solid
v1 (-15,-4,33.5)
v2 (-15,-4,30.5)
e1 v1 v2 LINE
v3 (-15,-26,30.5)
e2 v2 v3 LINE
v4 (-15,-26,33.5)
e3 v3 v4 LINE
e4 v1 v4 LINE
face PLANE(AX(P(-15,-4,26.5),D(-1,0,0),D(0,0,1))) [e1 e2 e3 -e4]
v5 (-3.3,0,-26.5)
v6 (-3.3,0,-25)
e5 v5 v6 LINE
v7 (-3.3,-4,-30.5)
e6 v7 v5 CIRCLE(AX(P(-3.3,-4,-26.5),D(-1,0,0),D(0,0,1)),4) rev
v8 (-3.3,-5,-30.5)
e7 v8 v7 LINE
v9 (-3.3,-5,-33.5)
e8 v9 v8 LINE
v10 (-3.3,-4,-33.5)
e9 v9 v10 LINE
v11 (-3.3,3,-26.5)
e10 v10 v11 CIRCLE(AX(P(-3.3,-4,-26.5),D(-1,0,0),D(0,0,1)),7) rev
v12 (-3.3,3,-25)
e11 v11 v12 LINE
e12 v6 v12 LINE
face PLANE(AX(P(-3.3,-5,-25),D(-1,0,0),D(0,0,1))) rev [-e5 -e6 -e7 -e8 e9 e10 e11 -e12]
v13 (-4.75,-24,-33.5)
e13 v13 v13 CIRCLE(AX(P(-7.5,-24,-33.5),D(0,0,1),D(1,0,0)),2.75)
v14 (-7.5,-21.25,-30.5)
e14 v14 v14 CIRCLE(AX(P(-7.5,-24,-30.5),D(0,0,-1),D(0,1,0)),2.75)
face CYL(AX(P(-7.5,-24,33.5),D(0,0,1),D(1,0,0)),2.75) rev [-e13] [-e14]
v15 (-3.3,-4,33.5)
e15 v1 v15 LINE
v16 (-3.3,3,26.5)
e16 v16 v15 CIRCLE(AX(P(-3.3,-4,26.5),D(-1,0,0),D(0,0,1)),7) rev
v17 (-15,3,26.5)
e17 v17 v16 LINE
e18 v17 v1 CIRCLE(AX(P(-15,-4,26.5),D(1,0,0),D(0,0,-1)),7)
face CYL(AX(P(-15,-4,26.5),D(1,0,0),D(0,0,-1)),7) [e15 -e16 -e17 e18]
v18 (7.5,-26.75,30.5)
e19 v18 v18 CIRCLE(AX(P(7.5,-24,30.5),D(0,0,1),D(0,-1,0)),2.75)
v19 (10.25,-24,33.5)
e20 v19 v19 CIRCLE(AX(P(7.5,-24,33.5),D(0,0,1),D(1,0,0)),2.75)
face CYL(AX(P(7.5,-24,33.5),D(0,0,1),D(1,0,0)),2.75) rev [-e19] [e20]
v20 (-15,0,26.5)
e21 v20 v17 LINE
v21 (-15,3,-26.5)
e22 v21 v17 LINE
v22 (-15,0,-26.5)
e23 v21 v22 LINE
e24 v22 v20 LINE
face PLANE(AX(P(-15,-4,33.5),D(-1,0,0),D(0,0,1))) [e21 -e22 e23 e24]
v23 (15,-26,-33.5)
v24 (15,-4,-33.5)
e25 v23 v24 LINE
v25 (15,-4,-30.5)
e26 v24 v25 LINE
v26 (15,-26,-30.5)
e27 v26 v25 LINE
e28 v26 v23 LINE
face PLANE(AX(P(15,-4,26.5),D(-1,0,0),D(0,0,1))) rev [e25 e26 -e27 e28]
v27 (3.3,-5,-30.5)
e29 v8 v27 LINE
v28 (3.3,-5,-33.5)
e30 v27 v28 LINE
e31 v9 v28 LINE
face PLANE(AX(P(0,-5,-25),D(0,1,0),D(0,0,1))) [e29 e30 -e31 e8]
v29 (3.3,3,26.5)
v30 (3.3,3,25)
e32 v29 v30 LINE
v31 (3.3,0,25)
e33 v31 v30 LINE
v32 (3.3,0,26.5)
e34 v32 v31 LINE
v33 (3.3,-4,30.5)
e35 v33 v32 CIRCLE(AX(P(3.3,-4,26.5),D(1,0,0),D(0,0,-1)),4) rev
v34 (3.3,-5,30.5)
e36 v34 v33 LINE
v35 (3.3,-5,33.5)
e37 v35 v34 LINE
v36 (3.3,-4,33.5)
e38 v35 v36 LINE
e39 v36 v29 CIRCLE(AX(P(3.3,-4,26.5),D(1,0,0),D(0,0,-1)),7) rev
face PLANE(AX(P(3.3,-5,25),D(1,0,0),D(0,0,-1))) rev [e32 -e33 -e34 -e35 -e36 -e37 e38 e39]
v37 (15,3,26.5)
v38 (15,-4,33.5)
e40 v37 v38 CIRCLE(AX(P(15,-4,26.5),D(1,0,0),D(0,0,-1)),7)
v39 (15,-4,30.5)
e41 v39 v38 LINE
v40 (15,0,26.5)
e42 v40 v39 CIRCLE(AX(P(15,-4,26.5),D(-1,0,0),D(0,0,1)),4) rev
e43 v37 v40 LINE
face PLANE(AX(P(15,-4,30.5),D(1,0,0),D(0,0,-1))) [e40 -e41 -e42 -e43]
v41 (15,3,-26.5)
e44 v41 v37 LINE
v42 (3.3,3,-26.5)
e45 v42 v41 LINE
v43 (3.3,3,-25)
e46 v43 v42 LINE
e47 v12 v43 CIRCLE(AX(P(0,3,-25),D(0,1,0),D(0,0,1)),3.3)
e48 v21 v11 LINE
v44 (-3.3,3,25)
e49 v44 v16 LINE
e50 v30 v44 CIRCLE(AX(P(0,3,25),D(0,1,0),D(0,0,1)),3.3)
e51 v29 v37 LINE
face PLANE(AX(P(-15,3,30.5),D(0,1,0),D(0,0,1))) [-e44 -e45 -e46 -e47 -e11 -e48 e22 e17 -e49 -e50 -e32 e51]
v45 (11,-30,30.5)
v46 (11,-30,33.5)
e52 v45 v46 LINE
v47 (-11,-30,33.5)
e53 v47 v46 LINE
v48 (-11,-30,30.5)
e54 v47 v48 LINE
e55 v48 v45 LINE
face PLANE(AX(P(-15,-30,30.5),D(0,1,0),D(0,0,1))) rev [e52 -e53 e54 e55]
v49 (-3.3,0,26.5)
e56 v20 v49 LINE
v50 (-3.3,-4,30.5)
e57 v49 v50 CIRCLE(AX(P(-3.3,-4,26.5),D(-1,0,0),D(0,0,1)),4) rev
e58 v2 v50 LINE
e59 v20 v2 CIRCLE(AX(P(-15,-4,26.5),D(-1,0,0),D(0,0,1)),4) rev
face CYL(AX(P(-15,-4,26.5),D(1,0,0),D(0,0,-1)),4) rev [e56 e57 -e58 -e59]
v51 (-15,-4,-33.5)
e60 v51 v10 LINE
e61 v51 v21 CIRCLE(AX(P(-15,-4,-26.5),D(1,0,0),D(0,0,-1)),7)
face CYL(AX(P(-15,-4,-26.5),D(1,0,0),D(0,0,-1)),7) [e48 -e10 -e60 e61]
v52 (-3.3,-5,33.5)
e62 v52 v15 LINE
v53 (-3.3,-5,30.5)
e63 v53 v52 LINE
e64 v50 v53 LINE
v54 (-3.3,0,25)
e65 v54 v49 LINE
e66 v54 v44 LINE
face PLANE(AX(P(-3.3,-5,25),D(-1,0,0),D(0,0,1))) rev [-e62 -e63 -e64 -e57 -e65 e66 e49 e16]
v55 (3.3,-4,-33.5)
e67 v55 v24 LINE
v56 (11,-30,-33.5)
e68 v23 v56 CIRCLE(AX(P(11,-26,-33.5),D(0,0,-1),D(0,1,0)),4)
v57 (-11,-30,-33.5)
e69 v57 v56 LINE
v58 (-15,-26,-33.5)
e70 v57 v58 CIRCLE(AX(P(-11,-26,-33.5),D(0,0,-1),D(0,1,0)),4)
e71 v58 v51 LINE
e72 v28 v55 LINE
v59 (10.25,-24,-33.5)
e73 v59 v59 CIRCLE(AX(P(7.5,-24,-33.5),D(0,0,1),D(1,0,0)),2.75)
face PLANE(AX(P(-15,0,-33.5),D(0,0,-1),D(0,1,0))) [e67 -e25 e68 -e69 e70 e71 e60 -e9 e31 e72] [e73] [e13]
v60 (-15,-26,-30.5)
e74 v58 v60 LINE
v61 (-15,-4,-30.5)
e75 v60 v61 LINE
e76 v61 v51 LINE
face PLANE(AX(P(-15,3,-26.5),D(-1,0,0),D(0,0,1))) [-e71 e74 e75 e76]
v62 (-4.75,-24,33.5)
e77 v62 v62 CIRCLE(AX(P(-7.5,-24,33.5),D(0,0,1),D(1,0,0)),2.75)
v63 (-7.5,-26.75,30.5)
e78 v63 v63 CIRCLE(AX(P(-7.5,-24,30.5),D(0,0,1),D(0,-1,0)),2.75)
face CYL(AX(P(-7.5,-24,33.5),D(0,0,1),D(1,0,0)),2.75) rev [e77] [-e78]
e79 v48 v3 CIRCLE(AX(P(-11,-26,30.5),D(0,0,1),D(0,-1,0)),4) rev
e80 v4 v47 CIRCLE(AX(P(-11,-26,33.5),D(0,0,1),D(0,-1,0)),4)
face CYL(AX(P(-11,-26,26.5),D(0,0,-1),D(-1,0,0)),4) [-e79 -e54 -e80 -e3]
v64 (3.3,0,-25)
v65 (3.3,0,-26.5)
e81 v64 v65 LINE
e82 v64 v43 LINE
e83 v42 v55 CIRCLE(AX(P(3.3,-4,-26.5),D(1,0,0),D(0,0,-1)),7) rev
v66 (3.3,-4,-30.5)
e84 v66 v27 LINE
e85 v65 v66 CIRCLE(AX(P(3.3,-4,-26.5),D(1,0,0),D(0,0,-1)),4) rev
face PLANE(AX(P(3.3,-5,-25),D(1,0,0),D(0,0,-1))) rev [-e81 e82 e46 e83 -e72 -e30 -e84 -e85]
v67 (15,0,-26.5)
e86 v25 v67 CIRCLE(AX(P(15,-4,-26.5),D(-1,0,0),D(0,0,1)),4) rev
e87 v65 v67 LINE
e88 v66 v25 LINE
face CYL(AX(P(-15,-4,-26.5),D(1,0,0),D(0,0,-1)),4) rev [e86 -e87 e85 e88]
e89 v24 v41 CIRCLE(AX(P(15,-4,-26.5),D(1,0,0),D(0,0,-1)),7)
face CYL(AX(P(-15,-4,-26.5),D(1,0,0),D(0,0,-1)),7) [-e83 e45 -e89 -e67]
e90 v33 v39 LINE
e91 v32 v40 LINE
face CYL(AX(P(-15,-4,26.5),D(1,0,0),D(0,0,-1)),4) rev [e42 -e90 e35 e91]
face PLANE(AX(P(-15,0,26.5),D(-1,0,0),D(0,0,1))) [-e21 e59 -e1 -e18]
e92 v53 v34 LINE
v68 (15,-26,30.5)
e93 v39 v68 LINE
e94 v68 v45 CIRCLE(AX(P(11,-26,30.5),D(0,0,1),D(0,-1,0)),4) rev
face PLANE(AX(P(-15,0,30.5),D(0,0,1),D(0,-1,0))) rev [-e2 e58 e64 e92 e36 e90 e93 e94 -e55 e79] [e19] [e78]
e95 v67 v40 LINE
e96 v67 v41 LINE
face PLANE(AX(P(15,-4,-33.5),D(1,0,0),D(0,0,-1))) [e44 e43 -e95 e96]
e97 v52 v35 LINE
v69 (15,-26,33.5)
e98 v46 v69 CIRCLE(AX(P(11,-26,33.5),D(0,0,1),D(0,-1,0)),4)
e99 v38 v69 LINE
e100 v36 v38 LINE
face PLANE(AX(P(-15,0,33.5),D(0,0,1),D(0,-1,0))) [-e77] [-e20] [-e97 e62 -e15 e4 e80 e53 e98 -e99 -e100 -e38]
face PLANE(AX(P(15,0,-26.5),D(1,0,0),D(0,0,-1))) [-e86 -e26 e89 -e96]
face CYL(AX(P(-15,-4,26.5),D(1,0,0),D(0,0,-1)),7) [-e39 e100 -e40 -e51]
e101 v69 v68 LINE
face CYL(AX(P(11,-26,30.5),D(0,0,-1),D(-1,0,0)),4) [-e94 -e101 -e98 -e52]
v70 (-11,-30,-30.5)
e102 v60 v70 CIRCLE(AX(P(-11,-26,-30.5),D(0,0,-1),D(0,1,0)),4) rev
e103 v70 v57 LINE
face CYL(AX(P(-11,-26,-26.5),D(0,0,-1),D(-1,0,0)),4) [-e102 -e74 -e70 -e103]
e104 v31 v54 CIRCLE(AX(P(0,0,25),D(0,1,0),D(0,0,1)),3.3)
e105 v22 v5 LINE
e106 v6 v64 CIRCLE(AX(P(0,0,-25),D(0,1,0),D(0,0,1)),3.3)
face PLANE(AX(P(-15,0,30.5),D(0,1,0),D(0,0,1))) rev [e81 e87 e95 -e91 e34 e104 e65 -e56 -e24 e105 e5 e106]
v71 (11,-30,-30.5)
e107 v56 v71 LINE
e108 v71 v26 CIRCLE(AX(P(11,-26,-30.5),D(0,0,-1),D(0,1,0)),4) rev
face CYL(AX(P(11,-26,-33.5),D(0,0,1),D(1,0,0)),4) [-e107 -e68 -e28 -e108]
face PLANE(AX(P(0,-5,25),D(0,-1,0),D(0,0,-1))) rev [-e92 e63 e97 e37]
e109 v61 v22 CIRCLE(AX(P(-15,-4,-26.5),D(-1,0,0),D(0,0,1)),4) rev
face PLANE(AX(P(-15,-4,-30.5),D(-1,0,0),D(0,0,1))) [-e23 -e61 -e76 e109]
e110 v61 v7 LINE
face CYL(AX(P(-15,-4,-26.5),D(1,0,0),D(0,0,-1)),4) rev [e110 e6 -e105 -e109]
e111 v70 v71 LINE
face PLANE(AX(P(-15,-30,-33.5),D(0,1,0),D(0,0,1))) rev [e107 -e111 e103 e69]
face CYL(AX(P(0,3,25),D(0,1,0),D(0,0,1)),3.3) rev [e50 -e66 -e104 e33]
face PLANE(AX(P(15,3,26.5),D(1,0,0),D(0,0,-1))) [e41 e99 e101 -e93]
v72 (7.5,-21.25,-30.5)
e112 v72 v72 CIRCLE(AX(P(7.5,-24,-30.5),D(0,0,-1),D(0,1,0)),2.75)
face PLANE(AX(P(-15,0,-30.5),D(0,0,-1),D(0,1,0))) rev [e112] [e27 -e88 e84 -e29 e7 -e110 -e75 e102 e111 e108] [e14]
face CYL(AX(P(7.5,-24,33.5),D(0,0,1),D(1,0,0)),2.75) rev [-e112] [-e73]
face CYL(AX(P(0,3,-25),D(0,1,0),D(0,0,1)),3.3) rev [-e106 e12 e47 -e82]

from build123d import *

# Parameters (mm, degrees)
ODGI_CIE_BAZOWE1_DEPTH     = 15
OTW_R_POD_RUB_M51_D        = 5.5
ZAOKR_GLENIE1_R            = 4
OTW_R_POD_RUB_M61_D        = 6.6
WYTNIJ_WYCI_GNI_CIE2_START = -8
WYTNIJ_WYCI_GNI_CIE2_DEPTH = 8


# Sheet-metal steps are written as plain solids
with BuildPart() as part:
    # Szkic1 → Odgięcie bazowe1 (new, symmetric)
    with BuildSketch(Plane(origin=(0, 0, 0), x_dir=(0, 0, -1), z_dir=(1, 0, 0))):
        with BuildLine():
            Line((-30.5, -30), (-30.5, -4))
            ThreePointArc((-30.5, -4), (-29.328427125, -1.171572875), (-26.5, 0))
            Line((-26.5, 0), (26.5, 0))
            ThreePointArc((26.5, 0), (29.328427125, -1.171572875), (30.5, -4))
            Line((30.5, -4), (30.5, -30))
            Line((30.5, -30), (33.5, -30))
            Line((33.5, -30), (33.5, -4))
            ThreePointArc((33.5, -4), (31.449747468, 0.949747468), (26.5, 3))
            Line((26.5, 3), (-26.5, 3))
            ThreePointArc((-26.5, 3), (-31.449747468, 0.949747468), (-33.5, -4))
            Line((-33.5, -4), (-33.5, -30))
            Line((-33.5, -30), (-30.5, -30))
        make_face()
    extrude(amount=ODGI_CIE_BAZOWE1_DEPTH, both=True)

    # Otwór pod śrubę M51 (through all)
    with Locations(Plane.XY.offset(33.5)):
        with Locations((-7.5, -24), (7.5, -24)):
            Hole(OTW_R_POD_RUB_M51_D / 2)

    # Zaokrąglenie1
    zaokr_glenie1_edges = [part.edges().sort_by_distance(p)[0] for p in [
        (15, -30, -32),
        (15, -30, 32),
        (-15, -30, -32),
        (-15, -30, 32),
    ]]
    fillet(zaokr_glenie1_edges, radius=ZAOKR_GLENIE1_R)

    # Otwór pod śrubę M61 (through all)
    with Locations(Plane(origin=(0, 3, 0), x_dir=(1, 0, 0), z_dir=(0, 1, 0))):
        with Locations((0, 25), (0, -25)):
            Hole(OTW_R_POD_RUB_M61_D / 2)

    # Szkic10 → Wytnij-wyciągnięcie2 (cut)
    with BuildSketch(Plane(origin=(0, 3, 0), x_dir=(1, 0, 0), z_dir=(0, 1, 0)).offset(WYTNIJ_WYCI_GNI_CIE2_START)):
        with BuildLine():
            Line((-3.3, 25), (-3.3, 33.5))
            ThreePointArc((-3.3, 33.5), (0, 36.8), (3.3, 33.5))
            Line((3.3, 33.5), (3.3, 25))
            ThreePointArc((3.3, 25), (0, 21.7), (-3.3, 25))
        make_face()
        with BuildLine():
            Line((-3.3, -25), (-3.3, -33.5))
            ThreePointArc((-3.3, -33.5), (0, -36.8), (3.3, -33.5))
            Line((3.3, -33.5), (3.3, -25))
            ThreePointArc((3.3, -25), (0, -21.7), (-3.3, -25))
        make_face()
    extrude(amount=WYTNIJ_WYCI_GNI_CIE2_DEPTH, mode=Mode.SUBTRACT)


solid = part.part
